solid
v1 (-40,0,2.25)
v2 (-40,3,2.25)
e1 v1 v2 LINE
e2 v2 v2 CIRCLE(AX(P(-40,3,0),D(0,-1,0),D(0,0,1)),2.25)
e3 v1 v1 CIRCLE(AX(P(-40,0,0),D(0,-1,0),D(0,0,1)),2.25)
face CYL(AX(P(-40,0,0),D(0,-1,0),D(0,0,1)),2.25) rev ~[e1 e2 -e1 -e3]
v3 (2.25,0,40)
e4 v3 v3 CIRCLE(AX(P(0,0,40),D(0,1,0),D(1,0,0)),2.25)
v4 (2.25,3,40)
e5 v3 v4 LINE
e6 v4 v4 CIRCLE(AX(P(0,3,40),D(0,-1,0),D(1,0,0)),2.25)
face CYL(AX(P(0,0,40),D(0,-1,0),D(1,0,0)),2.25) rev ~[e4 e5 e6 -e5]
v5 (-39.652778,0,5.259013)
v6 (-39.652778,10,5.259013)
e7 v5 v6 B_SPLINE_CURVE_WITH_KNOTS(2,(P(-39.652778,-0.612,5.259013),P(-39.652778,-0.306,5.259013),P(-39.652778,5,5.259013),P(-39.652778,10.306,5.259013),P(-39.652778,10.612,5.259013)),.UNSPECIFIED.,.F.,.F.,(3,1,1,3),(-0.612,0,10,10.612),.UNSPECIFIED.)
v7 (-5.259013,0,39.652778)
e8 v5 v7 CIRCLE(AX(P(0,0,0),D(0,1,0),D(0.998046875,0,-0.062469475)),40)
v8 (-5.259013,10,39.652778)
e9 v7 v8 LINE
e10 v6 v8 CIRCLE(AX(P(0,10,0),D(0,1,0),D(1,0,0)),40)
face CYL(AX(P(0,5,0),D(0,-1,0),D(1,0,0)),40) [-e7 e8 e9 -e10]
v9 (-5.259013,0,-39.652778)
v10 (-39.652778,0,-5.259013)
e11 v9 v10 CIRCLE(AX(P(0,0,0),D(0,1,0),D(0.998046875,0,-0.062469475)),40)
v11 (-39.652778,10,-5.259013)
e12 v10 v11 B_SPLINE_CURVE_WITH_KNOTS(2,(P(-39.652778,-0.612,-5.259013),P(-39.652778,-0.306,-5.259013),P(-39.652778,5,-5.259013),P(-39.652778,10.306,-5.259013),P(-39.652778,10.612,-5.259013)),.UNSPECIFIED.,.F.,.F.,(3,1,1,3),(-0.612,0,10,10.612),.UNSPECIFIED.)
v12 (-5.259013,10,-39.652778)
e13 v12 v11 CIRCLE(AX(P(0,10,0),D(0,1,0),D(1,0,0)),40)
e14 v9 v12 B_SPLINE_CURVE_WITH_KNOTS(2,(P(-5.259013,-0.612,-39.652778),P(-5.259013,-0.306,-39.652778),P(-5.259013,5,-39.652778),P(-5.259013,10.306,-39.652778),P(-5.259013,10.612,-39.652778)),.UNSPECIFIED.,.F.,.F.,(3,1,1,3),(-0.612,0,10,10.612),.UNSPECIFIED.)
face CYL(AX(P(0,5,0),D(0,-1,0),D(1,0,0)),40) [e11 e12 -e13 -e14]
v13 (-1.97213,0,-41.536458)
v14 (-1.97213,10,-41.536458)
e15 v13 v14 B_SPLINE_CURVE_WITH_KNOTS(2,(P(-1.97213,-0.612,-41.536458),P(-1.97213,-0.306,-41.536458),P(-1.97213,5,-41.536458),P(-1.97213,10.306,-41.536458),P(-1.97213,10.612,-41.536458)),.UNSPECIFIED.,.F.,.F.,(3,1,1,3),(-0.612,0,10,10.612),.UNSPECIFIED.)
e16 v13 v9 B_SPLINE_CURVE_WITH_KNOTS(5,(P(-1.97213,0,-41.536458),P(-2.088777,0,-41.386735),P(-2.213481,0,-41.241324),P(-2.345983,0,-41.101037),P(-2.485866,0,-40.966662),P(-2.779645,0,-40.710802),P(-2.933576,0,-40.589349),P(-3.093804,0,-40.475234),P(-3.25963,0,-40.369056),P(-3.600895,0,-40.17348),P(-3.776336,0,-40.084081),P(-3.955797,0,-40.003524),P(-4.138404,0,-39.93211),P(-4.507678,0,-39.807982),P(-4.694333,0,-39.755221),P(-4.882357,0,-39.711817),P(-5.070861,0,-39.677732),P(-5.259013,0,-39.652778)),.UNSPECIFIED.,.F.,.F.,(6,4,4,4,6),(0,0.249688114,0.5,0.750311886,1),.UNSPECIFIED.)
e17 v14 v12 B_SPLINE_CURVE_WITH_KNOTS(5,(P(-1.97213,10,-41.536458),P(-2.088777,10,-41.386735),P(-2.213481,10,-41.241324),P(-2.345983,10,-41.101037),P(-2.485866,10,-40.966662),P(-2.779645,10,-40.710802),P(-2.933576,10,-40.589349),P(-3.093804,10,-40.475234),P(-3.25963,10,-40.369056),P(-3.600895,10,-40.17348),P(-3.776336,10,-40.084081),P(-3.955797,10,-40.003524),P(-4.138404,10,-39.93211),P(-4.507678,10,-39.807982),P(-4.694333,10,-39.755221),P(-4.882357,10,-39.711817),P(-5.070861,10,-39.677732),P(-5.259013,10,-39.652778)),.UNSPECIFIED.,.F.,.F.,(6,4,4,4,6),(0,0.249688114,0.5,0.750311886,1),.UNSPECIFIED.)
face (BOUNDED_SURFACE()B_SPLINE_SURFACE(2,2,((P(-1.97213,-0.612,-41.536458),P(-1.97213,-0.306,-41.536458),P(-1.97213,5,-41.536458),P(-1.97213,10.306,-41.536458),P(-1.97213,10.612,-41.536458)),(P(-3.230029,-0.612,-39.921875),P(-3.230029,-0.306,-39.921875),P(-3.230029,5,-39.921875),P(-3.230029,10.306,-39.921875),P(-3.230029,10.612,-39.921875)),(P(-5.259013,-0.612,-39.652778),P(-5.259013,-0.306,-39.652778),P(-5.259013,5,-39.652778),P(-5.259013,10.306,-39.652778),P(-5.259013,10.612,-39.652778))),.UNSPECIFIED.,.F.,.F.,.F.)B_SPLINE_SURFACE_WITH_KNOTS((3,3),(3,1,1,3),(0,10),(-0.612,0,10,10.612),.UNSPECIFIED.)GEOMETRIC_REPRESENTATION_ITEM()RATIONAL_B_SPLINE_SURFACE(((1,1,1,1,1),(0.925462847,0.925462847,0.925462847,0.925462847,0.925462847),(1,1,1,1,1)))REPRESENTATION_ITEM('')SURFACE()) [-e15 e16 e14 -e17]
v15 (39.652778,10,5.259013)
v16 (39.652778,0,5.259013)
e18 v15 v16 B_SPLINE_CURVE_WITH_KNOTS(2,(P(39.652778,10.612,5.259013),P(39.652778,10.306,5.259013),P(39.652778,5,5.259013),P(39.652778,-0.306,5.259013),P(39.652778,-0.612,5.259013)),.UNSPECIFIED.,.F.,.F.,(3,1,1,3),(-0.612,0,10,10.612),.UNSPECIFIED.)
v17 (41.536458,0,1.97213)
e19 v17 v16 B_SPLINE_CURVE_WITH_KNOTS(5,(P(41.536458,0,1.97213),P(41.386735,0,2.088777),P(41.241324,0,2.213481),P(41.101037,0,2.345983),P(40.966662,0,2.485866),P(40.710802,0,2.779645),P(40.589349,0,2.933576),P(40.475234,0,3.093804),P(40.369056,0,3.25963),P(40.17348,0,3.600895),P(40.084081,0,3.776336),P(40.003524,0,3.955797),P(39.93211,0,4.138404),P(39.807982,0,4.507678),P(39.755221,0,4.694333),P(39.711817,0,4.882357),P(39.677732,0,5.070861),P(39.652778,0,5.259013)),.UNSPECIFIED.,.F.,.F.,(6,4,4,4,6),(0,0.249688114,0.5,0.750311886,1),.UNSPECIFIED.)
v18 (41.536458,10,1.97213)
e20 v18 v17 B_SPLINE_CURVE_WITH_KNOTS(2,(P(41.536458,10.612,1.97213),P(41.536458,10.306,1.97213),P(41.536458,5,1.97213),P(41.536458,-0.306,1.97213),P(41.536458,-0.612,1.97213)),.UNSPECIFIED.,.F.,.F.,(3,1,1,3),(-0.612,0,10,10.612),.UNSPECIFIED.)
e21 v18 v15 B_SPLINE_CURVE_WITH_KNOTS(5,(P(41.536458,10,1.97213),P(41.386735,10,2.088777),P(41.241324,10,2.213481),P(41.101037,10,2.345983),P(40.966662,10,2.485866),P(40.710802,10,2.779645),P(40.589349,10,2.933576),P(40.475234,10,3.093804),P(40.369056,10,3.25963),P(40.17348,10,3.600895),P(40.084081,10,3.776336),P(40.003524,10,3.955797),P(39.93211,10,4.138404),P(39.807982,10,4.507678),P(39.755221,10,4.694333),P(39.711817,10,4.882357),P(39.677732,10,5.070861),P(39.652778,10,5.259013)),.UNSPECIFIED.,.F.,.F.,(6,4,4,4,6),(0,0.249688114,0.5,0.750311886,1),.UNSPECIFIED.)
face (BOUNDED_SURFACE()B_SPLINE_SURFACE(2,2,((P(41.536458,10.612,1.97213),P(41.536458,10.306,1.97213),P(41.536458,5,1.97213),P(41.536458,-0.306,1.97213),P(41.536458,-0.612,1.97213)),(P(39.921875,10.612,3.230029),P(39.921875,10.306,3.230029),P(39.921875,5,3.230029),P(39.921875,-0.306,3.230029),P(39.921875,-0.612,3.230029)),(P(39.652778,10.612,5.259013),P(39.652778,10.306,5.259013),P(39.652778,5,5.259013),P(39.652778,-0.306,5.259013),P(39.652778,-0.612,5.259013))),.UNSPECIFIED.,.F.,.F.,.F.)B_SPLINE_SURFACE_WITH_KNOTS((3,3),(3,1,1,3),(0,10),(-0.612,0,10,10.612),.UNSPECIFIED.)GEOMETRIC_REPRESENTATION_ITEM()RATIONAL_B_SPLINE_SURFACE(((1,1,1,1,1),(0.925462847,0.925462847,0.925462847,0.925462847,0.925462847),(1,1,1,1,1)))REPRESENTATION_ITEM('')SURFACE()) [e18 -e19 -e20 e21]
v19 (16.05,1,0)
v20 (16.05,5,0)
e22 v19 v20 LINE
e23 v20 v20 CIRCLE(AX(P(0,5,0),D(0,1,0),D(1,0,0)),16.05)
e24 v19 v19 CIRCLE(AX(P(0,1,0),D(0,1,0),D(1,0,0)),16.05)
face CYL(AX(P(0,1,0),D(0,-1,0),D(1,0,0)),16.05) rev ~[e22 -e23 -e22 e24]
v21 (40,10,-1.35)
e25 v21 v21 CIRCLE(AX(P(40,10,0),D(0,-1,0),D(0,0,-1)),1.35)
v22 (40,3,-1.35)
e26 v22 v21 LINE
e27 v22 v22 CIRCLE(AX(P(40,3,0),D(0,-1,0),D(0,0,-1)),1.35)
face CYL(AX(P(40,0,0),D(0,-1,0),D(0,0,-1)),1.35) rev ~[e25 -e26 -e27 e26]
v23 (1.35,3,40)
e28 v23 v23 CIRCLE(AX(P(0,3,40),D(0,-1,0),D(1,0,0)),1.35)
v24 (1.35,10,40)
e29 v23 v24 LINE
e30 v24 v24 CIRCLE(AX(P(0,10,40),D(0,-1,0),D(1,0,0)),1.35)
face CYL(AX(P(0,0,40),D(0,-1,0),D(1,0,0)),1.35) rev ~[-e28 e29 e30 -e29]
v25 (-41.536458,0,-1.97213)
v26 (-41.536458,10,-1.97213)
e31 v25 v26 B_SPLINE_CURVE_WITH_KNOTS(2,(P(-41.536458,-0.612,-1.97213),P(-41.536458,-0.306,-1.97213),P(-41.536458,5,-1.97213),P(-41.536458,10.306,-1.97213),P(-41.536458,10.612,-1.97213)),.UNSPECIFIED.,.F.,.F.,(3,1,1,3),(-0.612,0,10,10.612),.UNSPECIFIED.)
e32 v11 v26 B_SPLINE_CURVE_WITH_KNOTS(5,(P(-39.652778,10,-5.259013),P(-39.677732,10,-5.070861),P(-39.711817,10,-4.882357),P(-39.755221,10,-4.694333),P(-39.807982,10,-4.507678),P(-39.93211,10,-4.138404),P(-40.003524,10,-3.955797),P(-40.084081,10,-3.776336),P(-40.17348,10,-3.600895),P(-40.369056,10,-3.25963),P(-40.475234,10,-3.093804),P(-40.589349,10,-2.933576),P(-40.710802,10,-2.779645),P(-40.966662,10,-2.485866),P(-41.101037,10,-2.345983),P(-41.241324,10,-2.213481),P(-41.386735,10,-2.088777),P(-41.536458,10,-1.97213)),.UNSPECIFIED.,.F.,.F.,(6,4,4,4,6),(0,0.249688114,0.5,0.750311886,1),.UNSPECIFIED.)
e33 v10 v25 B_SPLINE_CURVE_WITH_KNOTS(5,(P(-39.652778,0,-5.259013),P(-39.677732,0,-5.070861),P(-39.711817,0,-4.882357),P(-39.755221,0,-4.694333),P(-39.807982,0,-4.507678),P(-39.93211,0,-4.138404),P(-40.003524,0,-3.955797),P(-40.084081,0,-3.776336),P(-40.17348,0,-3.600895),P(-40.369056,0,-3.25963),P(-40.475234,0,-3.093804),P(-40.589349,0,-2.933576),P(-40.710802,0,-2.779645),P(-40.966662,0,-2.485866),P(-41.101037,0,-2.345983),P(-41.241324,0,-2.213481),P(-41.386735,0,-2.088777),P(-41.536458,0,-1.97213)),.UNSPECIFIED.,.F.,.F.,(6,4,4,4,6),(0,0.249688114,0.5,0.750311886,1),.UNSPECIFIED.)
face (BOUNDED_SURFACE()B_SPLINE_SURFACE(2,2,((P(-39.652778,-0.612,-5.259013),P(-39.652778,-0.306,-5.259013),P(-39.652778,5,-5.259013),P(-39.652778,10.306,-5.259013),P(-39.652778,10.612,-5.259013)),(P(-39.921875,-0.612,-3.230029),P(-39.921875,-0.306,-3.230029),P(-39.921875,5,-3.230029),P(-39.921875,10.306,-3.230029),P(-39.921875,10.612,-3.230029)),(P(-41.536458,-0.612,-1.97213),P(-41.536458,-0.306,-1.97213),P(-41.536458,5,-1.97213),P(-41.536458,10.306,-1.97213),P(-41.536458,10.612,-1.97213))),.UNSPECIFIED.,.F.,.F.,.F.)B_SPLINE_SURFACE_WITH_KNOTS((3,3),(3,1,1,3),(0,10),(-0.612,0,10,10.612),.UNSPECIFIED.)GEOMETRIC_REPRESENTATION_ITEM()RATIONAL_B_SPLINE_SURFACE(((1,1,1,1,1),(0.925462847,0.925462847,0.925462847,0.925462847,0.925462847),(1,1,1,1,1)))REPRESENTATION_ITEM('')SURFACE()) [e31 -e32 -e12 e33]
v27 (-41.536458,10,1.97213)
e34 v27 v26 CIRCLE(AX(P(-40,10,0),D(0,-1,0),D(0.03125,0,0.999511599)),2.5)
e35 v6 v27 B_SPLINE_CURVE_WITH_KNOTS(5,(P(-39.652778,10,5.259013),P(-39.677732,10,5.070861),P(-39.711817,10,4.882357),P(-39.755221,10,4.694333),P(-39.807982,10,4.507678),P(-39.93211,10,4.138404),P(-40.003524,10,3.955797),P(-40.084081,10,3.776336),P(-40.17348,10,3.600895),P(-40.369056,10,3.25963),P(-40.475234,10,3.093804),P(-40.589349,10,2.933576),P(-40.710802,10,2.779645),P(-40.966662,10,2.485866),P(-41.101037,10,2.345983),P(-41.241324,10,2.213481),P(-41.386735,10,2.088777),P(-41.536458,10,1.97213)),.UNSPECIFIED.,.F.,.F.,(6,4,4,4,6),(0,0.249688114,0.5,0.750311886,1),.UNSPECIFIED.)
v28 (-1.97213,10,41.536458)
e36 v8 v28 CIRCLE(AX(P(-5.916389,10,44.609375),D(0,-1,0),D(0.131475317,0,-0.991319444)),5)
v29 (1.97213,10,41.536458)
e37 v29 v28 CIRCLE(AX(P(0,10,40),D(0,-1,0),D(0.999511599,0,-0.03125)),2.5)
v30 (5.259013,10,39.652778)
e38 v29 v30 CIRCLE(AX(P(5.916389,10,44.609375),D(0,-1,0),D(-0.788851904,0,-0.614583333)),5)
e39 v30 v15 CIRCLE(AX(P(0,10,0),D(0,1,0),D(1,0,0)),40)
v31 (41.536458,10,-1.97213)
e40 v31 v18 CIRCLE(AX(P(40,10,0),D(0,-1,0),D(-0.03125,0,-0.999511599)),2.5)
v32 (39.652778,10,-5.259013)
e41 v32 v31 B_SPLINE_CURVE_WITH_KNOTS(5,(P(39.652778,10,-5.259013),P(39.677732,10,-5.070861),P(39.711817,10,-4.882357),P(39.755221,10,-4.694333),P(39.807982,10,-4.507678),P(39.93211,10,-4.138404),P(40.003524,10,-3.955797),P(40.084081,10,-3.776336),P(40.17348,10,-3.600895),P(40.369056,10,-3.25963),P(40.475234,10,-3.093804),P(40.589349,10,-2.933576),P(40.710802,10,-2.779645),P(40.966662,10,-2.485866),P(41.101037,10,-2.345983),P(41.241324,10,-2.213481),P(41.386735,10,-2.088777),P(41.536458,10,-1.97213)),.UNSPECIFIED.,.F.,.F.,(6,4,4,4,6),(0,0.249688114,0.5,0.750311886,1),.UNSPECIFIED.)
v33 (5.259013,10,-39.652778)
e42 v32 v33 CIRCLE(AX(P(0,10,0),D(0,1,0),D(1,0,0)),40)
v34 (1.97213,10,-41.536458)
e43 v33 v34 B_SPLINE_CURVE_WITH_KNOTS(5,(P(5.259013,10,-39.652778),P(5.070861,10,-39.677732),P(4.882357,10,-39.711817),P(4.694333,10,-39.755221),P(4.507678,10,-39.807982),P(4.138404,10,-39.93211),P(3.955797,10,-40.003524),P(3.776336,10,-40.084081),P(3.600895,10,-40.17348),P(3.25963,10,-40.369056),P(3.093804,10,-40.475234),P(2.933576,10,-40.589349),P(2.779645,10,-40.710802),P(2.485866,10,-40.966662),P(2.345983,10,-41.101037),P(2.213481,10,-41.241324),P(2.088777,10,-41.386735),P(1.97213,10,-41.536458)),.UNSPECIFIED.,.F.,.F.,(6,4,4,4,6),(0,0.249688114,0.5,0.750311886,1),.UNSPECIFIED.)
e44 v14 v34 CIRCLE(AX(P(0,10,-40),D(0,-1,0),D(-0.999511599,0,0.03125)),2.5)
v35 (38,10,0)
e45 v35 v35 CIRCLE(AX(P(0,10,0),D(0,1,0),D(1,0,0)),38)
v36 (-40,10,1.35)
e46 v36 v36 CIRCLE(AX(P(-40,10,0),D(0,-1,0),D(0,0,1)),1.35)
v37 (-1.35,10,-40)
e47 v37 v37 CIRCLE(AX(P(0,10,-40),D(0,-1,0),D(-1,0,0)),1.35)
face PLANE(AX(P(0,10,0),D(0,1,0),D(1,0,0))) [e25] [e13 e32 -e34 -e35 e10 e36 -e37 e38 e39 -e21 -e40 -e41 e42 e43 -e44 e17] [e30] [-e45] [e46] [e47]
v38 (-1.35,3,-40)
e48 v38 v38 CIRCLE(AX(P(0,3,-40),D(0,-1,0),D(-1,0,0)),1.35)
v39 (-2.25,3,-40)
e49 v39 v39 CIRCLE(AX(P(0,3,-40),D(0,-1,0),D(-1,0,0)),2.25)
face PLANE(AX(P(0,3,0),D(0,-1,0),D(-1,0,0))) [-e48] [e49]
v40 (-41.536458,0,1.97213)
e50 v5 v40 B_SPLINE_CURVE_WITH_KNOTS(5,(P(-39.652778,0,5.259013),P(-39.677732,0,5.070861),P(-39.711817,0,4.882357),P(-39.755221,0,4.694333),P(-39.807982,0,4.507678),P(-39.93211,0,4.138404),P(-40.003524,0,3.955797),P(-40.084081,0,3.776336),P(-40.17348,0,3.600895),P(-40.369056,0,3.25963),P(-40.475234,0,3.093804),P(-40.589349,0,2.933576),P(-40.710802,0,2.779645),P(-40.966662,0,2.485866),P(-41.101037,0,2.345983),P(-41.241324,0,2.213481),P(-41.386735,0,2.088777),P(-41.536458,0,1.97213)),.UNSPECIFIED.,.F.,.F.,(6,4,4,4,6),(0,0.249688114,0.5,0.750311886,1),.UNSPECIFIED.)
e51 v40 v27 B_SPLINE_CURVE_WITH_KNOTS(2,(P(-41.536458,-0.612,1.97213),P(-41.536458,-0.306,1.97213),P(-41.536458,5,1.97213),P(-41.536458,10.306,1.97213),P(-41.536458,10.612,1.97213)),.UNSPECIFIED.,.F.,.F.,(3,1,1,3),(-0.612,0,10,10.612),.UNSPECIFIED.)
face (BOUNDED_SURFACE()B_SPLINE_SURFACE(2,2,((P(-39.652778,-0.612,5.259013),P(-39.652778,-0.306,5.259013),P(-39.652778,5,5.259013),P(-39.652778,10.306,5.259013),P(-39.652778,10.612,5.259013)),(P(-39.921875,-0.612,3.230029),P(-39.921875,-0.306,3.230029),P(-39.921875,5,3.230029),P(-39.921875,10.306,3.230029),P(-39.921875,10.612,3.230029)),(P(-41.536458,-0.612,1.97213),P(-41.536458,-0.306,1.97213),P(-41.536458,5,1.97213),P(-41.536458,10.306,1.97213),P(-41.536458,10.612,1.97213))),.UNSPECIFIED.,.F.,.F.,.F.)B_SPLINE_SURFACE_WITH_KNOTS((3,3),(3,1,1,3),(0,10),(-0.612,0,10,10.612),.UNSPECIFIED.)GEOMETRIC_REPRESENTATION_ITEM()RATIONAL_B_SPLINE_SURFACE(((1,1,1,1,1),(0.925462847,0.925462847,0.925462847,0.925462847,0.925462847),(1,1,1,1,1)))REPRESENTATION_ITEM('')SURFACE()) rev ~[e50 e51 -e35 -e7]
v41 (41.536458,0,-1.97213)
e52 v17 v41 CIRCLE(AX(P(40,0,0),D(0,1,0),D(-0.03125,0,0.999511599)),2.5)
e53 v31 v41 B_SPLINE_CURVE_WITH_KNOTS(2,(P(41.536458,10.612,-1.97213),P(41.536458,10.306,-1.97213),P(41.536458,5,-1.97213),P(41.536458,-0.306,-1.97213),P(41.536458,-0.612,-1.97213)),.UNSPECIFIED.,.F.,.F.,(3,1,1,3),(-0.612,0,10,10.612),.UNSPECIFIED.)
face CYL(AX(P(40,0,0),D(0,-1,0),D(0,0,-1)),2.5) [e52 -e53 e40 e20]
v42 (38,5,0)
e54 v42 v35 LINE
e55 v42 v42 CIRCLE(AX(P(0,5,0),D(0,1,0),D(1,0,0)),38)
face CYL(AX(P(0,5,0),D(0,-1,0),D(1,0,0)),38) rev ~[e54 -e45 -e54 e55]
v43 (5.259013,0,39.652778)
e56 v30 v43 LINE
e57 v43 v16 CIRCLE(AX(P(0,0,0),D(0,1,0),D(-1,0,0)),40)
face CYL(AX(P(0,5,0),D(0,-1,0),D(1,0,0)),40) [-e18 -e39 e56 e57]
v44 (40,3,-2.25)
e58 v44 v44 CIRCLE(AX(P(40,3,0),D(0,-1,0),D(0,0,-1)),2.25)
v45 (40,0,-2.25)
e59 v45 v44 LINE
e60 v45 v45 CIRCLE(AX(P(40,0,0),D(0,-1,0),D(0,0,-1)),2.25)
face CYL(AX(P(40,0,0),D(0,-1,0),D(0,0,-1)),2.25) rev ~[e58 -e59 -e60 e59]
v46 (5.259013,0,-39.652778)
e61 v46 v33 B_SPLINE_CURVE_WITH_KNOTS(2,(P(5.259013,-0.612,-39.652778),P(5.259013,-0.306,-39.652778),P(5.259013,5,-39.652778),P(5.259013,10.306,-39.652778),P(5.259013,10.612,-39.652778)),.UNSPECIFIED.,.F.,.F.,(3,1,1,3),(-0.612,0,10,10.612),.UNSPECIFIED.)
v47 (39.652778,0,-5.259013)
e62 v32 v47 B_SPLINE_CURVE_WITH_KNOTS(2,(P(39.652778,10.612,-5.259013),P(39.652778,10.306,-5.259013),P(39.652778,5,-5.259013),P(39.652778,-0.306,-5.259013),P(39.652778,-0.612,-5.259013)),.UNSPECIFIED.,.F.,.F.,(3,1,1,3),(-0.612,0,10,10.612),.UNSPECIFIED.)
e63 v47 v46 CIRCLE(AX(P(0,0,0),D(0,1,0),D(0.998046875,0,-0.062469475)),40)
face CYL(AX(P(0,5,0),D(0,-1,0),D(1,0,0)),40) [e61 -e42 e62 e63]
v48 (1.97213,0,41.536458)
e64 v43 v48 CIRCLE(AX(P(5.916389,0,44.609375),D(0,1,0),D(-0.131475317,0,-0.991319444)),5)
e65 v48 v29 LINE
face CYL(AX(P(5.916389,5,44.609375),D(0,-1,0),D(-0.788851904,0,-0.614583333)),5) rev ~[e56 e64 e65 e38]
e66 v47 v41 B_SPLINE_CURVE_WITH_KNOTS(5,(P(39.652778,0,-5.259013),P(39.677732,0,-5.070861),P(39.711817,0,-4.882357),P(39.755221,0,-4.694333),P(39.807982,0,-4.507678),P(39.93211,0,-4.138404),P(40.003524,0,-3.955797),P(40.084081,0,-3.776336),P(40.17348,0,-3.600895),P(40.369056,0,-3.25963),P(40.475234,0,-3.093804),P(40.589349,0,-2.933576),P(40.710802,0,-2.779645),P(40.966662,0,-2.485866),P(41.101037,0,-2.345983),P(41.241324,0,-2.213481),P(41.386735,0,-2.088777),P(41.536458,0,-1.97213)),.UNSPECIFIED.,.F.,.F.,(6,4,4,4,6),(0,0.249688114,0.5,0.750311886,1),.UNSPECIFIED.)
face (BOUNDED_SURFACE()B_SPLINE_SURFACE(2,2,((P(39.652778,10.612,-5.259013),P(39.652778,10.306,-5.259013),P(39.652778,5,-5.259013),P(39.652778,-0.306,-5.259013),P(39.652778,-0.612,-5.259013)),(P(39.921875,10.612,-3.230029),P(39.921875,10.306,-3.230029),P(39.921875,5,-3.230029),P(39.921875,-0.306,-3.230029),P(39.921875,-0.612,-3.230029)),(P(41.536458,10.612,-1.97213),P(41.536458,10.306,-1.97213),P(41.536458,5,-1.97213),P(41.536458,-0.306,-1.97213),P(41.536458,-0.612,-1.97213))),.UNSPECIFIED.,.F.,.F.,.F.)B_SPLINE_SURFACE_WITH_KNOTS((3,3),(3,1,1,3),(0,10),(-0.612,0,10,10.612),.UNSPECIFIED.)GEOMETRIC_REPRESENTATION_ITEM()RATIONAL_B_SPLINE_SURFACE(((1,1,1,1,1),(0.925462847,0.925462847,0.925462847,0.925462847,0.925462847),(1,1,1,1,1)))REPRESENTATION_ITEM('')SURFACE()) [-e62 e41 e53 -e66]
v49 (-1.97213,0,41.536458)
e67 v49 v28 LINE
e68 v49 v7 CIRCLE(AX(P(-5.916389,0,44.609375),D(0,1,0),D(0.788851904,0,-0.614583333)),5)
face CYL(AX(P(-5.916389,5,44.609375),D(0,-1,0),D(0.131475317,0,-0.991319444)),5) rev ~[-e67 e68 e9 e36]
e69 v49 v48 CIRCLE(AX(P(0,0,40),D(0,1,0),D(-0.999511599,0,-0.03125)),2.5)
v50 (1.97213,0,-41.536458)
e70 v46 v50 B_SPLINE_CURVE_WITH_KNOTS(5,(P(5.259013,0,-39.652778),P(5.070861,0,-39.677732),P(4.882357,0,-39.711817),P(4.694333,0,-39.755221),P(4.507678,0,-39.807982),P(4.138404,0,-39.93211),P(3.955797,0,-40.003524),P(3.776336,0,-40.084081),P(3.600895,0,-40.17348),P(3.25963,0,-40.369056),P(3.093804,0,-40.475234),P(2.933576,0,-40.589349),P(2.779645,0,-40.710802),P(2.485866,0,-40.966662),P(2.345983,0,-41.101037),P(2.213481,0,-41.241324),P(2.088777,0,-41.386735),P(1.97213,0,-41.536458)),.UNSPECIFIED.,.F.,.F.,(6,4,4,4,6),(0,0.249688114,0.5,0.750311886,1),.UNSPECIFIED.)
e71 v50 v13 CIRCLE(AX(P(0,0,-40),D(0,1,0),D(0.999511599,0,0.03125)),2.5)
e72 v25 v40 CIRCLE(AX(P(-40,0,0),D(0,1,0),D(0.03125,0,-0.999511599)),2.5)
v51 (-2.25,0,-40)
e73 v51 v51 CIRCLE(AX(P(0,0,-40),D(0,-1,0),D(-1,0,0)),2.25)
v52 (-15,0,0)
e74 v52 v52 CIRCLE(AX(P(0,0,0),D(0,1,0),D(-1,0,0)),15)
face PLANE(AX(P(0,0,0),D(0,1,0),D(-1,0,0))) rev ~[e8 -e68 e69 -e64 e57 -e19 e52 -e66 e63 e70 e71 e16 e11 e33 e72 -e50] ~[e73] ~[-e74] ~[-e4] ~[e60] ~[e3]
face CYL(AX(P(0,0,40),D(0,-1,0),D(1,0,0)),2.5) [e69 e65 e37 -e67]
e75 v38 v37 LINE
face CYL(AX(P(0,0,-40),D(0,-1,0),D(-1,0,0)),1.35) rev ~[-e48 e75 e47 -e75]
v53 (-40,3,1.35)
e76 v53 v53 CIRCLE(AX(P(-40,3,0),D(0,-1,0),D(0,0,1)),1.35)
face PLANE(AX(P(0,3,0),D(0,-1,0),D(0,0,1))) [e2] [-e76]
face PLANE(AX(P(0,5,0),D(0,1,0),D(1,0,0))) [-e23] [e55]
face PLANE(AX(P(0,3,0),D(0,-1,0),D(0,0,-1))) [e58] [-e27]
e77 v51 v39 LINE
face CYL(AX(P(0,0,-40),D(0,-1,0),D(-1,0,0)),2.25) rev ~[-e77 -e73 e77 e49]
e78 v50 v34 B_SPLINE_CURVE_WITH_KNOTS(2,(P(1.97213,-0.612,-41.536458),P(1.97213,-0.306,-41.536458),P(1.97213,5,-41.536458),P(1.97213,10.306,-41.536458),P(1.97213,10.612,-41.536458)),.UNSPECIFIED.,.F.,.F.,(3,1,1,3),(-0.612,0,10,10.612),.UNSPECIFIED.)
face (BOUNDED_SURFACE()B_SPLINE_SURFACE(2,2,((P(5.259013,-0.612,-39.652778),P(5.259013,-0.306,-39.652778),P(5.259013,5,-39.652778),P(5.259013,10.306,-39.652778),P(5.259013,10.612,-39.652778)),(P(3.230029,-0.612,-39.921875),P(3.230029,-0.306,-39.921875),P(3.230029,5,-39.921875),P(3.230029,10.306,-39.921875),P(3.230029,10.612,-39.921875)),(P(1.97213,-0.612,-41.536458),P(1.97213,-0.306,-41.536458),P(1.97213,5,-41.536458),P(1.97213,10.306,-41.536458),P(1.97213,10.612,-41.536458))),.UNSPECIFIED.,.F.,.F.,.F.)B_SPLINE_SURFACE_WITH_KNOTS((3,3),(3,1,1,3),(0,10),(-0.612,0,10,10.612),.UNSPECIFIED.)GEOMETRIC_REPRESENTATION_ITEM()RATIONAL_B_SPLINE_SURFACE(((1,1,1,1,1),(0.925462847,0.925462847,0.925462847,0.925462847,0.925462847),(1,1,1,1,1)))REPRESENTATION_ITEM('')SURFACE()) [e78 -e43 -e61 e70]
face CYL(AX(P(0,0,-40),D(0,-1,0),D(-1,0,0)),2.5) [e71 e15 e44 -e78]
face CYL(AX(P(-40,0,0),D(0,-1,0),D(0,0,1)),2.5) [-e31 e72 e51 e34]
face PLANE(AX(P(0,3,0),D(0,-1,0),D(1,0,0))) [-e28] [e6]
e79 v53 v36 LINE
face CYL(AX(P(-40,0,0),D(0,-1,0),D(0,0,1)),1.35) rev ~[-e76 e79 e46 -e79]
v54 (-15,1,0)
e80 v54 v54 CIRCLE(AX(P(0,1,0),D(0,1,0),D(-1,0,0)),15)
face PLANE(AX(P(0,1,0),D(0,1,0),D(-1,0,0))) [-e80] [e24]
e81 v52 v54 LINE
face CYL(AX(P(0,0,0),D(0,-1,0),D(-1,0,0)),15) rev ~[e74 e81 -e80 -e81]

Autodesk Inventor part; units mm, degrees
ref_plane "YZ Plane" through (0, 0, 0) normal (1, 0, 0) x (0, 1, 0)
ref_plane "XZ Plane" through (0, 0, 0) normal (0, 1, 0) x (-1, 0, 0)
ref_plane "XY Plane" through (0, 0, 0) normal (0, 0, 1) x (1, 0, 0)
sketch "Szkic1" plane through (0, 0, 0) normal (0, 1, 0) x (-1, 0, 0)
  circle A0 centre (0, 0) radius 40
  circle A1 centre (0, 0) radius 15
  dimension "d0" = 80
  dimension "d1" = 30
extrude "Wyciągnięcie proste1" add sketch "Szkic1" along normal blind 1
sketch "Szkic2" plane through (0, 1, 0) normal (0, 1, 0) x (1, 0, 0)
  circle A0 centre (0, 0) radius 40
  circle A1 centre (0, 0) radius 16.05
  dimension "d4" = 32.1
extrude "Wyciągnięcie proste2" add sketch "Szkic2" along normal blind 4
sketch "Szkic3" plane through (0, 5, 0) normal (0, 1, 0) x (1, 0, 0)
  circle A0 centre (0, 0) radius 40
  circle A1 centre (0, 0) radius 38
  dimension "d7" = 76
extrude "Wyciągnięcie proste3" add sketch "Szkic3" along normal blind 5
sketch "Szkic4" plane through (0, 0, 0) normal (0, -1, 0) x (1, 0, 0)
  circle A0 centre (0, 0) radius 40 projected
  circle A1 centre (0, 40) radius 1.35
  circle A2 centre (0, 40) radius 2.5
  point P0 (2.4988, 39.9219)
  point P1 (-2.4988, 39.9219)
  dimension "d10" = 2.7
  dimension "d11" = 5
extrude "Wyciągnięcie proste4" add sketch "Szkic4" against normal blind 10 contours A0 A1 A2 | A0 A1 picked at (1.9426, 40.8023) picked at (0.0508, 40.4454)
fillet "Zaokrąglenie1" radius 5 4 edges at (2.4988, 0.5, 39.9219) (2.4988, 5.5, 39.9219) (-2.4988, 5.5, 39.9219) (-2.4988, 0.5, 39.9219)
sketch "Szkic5" plane through (0, 0, 0) normal (0, -1, 0) x (1, 0, 0)
  circle A0 centre (0, 40) radius 1.35
  point P0 (0, 0)
  dimension "d15" = 2.7
extrude "Wyciągnięcie proste5" cut sketch "Szkic5" against normal blind 10
sketch "Szkic6" plane through (0, 0, 0) normal (0, -1, 0) x (1, 0, 0)
  circle A0 centre (0, 40) radius 1.35 projected
  circle A1 centre (0, 40) radius 2.25
  point P0 (0, 0)
  dimension "d18" = 4.5
extrude "Wyciągnięcie proste6" cut sketch "Szkic6" against normal blind 3
pattern_circular "Szyk kołowy1" count 4 over 360 about axis through (0, 0, 0) along (0, 1, 0) of "Wyciągnięcie proste5", "Wyciągnięcie proste6", "Zaokrąglenie1", "Wyciągnięcie proste4"
properties part number "End"
